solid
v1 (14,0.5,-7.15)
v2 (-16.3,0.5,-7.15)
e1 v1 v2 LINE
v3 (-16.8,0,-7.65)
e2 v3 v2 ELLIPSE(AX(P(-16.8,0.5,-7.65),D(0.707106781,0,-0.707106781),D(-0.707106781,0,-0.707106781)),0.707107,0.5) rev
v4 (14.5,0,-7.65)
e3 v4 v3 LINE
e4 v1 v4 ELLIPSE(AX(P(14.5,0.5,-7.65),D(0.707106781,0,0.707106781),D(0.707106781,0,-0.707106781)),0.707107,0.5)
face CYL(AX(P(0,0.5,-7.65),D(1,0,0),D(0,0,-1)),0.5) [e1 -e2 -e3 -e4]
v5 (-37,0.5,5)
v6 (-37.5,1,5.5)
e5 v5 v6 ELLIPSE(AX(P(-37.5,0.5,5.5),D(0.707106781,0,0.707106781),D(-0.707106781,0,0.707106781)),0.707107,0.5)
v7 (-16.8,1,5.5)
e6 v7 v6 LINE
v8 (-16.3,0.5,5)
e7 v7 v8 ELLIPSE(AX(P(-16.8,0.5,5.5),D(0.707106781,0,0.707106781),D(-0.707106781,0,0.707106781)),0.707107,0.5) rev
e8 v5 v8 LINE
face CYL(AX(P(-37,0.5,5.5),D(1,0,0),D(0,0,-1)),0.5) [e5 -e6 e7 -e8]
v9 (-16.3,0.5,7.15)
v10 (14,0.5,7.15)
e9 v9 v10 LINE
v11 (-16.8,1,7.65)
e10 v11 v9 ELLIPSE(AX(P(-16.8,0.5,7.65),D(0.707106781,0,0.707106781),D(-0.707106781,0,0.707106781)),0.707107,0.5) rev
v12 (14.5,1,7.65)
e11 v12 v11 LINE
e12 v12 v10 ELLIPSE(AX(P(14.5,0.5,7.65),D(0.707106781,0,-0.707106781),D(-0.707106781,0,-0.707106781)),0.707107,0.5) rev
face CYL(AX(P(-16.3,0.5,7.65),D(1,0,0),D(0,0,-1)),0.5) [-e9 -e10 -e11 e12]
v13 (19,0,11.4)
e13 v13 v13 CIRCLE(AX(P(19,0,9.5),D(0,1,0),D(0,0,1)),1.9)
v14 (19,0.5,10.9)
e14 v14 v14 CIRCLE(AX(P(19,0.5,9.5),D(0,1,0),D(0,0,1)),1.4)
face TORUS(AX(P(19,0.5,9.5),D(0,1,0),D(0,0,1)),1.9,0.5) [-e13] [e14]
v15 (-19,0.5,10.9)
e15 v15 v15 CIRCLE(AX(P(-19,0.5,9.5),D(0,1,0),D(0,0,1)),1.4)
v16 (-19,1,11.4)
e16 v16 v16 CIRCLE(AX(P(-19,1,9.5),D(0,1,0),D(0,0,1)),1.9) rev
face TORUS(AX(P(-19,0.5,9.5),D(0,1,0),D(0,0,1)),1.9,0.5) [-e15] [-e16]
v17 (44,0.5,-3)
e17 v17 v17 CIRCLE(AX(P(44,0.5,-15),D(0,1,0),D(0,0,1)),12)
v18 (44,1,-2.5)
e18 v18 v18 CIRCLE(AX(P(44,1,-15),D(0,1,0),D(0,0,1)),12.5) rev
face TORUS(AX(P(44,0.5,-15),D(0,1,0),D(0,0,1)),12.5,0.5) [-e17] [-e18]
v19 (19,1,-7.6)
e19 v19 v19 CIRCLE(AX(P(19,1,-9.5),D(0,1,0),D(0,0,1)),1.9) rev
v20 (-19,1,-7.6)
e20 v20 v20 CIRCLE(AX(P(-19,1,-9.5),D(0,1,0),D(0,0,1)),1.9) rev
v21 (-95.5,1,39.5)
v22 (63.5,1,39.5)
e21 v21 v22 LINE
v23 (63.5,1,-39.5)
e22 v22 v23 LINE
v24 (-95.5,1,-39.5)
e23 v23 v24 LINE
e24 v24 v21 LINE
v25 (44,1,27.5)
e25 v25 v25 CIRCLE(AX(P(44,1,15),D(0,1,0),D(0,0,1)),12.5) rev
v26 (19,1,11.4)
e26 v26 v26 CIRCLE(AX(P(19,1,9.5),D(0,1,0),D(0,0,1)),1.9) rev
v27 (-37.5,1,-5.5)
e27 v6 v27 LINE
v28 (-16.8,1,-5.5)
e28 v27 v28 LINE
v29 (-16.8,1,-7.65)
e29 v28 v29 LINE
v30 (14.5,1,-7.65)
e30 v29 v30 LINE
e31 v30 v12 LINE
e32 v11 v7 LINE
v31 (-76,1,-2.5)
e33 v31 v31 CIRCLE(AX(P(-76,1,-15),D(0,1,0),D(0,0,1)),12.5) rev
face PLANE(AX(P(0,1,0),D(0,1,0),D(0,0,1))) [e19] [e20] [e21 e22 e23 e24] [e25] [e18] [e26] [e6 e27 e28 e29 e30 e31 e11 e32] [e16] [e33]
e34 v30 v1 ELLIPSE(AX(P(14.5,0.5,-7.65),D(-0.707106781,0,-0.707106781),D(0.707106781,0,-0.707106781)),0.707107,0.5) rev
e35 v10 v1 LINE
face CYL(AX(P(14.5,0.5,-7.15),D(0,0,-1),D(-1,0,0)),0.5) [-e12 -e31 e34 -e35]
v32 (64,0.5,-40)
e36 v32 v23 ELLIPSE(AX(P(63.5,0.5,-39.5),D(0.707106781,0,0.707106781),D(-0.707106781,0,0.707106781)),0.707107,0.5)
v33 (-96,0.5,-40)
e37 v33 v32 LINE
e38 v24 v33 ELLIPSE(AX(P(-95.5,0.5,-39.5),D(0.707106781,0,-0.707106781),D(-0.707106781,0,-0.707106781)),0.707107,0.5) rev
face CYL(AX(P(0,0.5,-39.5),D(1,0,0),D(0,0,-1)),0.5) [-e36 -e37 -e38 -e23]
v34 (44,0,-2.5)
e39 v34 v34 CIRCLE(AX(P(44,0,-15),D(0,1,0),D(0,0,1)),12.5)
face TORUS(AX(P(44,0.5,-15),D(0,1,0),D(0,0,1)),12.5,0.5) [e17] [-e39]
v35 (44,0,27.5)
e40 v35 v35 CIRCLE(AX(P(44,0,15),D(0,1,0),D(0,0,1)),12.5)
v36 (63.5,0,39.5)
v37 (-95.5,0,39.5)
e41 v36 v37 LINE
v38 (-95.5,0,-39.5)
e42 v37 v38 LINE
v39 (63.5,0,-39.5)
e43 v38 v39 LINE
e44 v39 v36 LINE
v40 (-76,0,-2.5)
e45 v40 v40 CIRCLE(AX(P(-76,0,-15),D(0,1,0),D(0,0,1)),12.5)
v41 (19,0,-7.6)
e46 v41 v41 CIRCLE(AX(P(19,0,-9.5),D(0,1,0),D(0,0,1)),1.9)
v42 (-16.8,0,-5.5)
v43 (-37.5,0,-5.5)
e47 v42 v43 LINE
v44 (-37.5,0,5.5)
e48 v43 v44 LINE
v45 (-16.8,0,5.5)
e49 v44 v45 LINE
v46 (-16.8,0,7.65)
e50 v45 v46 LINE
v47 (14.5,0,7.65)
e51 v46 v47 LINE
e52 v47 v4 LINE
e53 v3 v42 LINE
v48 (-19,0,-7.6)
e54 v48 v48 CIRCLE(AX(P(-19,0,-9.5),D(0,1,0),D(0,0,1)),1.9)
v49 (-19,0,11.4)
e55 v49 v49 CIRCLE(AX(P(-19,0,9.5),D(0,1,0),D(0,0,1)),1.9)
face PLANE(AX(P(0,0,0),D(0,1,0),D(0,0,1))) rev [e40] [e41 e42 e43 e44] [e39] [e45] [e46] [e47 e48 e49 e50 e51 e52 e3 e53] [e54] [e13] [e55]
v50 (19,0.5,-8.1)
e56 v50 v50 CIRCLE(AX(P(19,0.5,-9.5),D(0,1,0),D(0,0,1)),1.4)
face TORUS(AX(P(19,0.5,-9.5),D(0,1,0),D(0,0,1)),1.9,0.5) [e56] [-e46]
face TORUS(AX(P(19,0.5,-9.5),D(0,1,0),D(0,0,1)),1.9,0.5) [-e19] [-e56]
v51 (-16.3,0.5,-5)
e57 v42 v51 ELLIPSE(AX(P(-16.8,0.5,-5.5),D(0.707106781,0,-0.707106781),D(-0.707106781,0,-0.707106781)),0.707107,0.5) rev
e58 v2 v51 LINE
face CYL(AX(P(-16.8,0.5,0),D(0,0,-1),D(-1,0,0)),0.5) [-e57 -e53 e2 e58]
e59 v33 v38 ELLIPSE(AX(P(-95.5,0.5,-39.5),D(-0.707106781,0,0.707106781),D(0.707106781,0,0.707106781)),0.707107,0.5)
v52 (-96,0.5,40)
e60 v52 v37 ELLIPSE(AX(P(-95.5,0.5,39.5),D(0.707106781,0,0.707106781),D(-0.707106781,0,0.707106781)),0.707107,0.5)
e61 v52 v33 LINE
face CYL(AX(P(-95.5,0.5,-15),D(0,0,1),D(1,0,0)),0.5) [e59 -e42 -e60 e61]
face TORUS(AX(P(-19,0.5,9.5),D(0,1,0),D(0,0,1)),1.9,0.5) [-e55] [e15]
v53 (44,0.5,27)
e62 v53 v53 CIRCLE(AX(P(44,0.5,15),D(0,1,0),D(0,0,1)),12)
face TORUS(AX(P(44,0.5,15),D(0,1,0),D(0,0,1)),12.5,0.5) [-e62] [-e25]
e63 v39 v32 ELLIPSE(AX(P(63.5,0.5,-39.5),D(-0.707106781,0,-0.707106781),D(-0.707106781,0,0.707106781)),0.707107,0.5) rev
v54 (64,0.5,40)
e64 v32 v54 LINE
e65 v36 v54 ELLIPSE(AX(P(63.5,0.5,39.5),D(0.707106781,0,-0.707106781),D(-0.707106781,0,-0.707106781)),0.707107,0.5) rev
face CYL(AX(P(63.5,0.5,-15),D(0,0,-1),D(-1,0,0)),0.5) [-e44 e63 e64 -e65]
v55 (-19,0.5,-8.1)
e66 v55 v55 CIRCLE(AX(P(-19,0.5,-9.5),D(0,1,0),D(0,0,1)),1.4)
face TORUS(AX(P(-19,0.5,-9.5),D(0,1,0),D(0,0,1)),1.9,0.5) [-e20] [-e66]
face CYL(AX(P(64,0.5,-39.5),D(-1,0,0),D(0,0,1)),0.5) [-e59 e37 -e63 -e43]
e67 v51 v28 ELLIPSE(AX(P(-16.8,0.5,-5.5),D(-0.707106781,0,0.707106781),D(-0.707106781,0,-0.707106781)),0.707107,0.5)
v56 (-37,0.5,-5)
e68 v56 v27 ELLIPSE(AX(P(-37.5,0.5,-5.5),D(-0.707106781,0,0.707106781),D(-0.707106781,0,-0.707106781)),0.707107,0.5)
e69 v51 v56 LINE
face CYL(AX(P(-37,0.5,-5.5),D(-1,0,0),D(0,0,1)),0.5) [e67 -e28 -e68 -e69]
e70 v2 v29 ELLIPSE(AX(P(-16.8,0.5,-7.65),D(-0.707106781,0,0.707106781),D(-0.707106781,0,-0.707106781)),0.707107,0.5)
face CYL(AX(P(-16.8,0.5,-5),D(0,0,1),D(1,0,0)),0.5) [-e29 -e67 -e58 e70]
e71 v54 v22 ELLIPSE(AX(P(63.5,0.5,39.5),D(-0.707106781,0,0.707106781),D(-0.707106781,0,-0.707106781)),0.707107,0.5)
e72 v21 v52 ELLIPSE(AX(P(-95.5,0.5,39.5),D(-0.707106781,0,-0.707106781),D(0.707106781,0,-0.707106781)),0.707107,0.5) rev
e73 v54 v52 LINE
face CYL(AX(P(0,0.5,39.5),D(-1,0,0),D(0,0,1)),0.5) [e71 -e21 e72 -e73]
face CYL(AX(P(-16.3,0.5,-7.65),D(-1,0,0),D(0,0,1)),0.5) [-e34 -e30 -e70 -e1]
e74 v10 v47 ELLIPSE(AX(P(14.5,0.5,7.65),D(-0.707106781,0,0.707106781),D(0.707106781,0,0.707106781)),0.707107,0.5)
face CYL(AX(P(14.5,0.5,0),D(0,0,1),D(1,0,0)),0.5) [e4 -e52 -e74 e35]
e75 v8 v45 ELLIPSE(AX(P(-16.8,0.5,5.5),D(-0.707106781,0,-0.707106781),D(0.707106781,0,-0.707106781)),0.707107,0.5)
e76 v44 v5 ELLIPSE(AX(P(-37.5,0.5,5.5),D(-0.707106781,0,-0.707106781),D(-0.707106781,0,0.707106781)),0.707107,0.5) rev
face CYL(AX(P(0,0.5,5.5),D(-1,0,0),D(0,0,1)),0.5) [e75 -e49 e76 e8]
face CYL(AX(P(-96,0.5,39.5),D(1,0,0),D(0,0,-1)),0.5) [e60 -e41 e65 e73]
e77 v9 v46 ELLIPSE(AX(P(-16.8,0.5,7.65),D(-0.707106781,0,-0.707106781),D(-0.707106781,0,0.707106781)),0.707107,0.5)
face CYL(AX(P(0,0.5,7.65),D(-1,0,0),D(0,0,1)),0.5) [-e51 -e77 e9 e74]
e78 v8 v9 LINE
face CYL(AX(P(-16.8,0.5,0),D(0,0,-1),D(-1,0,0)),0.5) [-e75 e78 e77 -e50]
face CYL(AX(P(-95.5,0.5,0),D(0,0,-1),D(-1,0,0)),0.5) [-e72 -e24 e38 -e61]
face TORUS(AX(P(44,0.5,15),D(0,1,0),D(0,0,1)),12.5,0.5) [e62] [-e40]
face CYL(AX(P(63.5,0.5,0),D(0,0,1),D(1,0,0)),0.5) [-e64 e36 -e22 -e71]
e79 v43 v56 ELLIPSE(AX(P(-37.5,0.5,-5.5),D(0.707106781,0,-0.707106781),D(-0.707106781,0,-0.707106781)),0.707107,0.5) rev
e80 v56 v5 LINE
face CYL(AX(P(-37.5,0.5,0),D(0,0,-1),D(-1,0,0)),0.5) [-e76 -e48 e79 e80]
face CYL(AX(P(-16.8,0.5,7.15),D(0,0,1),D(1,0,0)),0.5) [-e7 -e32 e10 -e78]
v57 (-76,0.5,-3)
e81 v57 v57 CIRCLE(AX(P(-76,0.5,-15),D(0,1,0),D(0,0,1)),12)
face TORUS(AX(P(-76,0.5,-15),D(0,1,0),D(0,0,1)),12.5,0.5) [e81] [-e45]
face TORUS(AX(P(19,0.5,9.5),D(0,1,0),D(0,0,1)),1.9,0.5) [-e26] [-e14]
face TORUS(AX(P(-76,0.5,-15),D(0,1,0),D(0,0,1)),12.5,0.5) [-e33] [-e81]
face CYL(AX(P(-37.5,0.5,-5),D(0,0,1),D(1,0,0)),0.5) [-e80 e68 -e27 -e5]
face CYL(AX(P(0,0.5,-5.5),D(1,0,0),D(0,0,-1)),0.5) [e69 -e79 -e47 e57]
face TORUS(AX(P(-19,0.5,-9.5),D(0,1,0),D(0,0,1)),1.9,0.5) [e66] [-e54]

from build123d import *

# Parameters (mm, degrees)
SKETCH1_R           = 12
SKETCH1_R_2         = 1.4
BOSS_EXTRUDE1_DEPTH = 1
FILLET1_R           = 0.5


with BuildPart() as part:
    # Sketch1 → Boss-Extrude1 (new body)
    with BuildSketch(Plane(origin=(0, 0, 0), x_dir=(1, 0, 0), z_dir=(0, 1, 0))):
        Polygon((-96, 15), (-96, -40), (64, -40), (64, 15), (64, 40), (-96, 40), align=None)
        with Locations(Location((44, 15, 0), (0, 0, 270))):
            Circle(SKETCH1_R, mode=Mode.SUBTRACT)
        with Locations(Location((-76, 15, 0), (0, 0, 270))):
            Circle(SKETCH1_R, mode=Mode.SUBTRACT)
        with Locations(Location((19, -9.5, 0), (0, 0, 270))):
            Circle(SKETCH1_R_2, mode=Mode.SUBTRACT)
        with Locations(Location((-19, -9.5, 0), (0, 0, 270))):
            Circle(SKETCH1_R_2, mode=Mode.SUBTRACT)
        with Locations(Location((-19, 9.5, 0), (0, 0, 270))):
            Circle(SKETCH1_R_2, mode=Mode.SUBTRACT)
        with Locations(Location((19, 9.5, 0), (0, 0, 270))):
            Circle(SKETCH1_R_2, mode=Mode.SUBTRACT)
        with Locations(Location((44, -15, 0), (0, 0, 270))):
            Circle(SKETCH1_R, mode=Mode.SUBTRACT)
        Polygon((-37, 5), (-16.3, 5), (-16.3, 7.15), (14, 7.15), (14, -7.15), (-16.3, -7.15), (-16.3, -5), (-37, -5), align=None, mode=Mode.SUBTRACT)
    extrude(amount=BOSS_EXTRUDE1_DEPTH)

    # Fillet1
    fillet1_edges = [part.edges().sort_by_distance(p)[0] for p in [
        (19, 0, -10.9),
        (-19, 0, -10.9),
        (19, 0, 8.1),
        (-19, 0, 8.1),
        (-26.65, 0, 5),
        (-37, 0, 0),
        (-26.65, 0, -5),
        (-16, 0, 40),
        (64, 0, 0),
        (-16, 0, -40),
        (-96, 0, 0),
        (44, 0, -27),
        (-76, 0, -27),
        (44, 0, 3),
        (19, 1, -10.9),
        (19, 1, 8.1),
        (-37, 1, 0),
        (-26.65, 1, 5),
        (-26.65, 1, -5),
        (44, 1, 3),
        (44, 1, -27),
        (-16, 1, -40),
        (64, 1, 0),
        (-16, 1, 40),
        (-96, 1, 0),
        (-76, 1, -27),
        (-19, 1, 8.1),
        (-19, 1, -10.9),
        (-1.15, 0, -7.15),
        (14, 0, 0),
        (-1.15, 0, 7.15),
        (14, 1, 0),
        (-1.15, 1, -7.15),
        (-1.15, 1, 7.15),
        (-16.3, 0, -6.075),
        (-16.3, 0, 6.075),
        (-16.3, 1, -6.075),
        (-16.3, 1, 6.075),
    ]]
    fillet(fillet1_edges, radius=FILLET1_R - 0.0001)  # a hair under: the kernel refuses the full size


solid = part.part
